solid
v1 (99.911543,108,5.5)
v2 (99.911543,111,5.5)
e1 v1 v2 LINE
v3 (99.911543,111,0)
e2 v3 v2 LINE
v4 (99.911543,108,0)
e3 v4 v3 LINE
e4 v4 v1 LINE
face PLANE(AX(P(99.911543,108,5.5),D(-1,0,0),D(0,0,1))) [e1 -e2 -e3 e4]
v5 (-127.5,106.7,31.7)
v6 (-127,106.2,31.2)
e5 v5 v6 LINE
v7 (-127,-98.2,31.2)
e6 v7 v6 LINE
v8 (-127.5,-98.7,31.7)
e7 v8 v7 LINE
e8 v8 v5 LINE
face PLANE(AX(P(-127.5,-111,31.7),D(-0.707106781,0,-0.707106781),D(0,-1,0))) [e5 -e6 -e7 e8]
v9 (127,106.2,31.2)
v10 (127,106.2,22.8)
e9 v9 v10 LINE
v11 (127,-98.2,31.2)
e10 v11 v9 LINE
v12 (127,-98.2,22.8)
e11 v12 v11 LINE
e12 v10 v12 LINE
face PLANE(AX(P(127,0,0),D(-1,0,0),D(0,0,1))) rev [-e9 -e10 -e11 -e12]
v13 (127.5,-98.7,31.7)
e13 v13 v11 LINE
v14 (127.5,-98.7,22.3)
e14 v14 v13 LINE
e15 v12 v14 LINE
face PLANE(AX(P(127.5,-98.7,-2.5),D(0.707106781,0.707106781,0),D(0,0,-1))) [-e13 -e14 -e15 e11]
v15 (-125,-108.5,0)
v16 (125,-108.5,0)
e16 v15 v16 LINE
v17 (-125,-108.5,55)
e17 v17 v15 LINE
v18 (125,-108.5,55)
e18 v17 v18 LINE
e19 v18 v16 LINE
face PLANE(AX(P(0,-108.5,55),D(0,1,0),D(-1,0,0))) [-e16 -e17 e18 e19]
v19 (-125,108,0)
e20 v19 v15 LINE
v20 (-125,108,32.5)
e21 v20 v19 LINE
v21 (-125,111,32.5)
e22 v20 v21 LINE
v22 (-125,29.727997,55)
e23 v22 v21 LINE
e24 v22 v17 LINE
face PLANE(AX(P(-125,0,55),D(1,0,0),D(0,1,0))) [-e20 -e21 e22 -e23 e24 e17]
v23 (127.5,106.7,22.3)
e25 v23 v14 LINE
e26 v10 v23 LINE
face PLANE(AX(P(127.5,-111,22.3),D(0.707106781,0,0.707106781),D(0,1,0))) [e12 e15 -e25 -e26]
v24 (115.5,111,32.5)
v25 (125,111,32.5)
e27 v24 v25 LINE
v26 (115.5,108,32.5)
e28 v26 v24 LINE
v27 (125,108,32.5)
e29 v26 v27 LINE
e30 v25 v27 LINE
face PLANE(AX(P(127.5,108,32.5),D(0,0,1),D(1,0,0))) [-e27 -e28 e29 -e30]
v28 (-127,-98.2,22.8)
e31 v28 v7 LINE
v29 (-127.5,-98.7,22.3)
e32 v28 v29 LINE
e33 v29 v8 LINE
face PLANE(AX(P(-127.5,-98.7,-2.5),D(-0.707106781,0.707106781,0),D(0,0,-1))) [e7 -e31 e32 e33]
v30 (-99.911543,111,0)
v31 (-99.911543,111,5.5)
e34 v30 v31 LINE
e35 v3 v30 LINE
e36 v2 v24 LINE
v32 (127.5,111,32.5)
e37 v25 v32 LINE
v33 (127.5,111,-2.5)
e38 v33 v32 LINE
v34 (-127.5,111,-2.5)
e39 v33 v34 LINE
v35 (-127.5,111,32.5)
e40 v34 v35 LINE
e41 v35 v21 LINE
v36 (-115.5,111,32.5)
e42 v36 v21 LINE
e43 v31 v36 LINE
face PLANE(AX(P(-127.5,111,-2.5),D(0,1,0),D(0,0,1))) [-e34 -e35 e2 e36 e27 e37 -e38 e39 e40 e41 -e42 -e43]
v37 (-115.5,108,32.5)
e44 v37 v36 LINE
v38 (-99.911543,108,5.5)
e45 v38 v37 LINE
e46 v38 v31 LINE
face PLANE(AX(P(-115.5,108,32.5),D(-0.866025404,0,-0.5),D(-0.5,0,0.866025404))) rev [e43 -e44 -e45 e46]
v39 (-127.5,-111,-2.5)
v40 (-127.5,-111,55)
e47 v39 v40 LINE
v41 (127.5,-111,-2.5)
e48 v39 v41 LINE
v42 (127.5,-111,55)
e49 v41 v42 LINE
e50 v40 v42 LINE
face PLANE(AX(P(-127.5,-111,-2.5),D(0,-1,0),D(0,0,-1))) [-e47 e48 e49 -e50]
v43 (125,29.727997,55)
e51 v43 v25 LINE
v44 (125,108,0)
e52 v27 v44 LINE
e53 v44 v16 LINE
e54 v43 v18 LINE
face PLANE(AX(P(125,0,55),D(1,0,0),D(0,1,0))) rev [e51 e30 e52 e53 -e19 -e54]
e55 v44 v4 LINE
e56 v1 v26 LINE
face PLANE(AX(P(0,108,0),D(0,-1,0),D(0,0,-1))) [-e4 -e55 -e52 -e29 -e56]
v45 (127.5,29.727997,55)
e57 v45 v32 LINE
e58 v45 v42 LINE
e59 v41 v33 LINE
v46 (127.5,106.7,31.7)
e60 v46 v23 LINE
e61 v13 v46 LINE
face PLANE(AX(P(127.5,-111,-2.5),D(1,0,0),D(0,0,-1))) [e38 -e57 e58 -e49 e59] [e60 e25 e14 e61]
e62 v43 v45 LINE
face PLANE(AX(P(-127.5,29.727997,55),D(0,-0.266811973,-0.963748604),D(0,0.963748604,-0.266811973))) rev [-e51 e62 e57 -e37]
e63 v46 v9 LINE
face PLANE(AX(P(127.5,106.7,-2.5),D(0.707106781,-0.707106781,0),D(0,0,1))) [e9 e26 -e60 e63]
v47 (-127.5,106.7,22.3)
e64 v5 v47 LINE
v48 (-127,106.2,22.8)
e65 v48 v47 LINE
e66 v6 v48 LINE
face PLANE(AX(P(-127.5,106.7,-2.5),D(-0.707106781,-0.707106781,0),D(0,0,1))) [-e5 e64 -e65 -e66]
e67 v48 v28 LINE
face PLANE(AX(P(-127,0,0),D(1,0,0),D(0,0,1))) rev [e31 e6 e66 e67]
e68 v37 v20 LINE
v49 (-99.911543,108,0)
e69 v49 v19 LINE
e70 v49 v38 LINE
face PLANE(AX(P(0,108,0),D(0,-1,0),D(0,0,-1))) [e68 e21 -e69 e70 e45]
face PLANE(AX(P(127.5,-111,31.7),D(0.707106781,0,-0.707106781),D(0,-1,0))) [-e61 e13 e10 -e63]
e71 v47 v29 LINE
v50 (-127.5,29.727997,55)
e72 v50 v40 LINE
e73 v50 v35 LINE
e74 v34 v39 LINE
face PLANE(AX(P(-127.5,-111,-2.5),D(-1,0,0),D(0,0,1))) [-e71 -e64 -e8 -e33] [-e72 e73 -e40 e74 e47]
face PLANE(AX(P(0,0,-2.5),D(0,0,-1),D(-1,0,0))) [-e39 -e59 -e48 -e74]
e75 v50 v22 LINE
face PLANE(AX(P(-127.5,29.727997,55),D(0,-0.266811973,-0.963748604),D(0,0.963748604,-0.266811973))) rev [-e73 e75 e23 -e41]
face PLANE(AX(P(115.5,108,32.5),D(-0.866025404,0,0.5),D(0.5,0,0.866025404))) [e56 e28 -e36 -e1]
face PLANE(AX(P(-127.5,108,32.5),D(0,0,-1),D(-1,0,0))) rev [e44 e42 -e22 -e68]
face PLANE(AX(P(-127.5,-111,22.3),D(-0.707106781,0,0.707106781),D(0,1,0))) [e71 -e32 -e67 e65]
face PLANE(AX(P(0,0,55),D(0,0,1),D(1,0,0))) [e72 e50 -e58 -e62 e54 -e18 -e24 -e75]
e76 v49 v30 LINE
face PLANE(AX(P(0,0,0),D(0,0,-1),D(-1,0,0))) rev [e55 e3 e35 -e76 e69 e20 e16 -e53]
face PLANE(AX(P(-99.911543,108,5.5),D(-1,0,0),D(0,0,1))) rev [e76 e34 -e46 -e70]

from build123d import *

# Parameters (mm, degrees)
SKETCH1_W                               = 255
SKETCH1_H                               = 222
BOSS_EXTRUDE1_DEPTH                     = 2.5
SKETCH2_W                               = 2.5
SKETCH2_H                               = 222
SKETCH2_W_2                             = 250
SKETCH2_H_2                             = 2.5
BOSS_EXTRUDE2_DEPTH                     = 55
HOLD_TAB_DEPTH                          = 3
FRONT_TAPER_DEPTH                       = 178.770216853
FRONT_TAPER_DEPTH_BACK                  = 178.770216853
SKETCH6_W                               = 8.4
SKETCH6_H                               = 204.4
MOUNTING_POCKET_DEPTH                   = 284.048140782
PRINT_CHAMFERS_SIZE                     = 0.5
PRINT_CHAMFERS_OF_MOUNTING_POCKETS_SIZE = 0.5


with BuildPart() as part:
    # Sketch1 → Boss-Extrude1 (new body)
    with BuildSketch(Plane.XY):
        Rectangle(SKETCH1_W, SKETCH1_H)
    extrude(amount=-BOSS_EXTRUDE1_DEPTH)

    # Sketch2 → Boss-Extrude2 (add)
    with BuildSketch(Plane.XY):
        with Locations((-126.25, 0)):
            Rectangle(SKETCH2_W, SKETCH2_H)
        with Locations((0, -109.75)):
            Rectangle(SKETCH2_W_2, SKETCH2_H_2)
        with Locations((126.25, 0)):
            Rectangle(SKETCH2_W, SKETCH2_H)
    extrude(amount=BOSS_EXTRUDE2_DEPTH)

    # Sketch4 → Hold Tab (add)
    with BuildSketch(Plane(origin=(0, 111, 0), x_dir=(1, 0, 0), z_dir=(0, 1, 0))):
        Polygon((127.5, 2.5), (127.5, -32.5), (115.5, -32.5), (99.911542732, -5.5), (99.911542732, 2.5), align=None)
    hold_tab = extrude(amount=-HOLD_TAB_DEPTH)

    # Hold Tabs: Hold Tab across plane
    add(hold_tab.mirror(Plane(origin=(0, 0, 0), x_dir=(0, 0, 1), z_dir=(1, 0, 0))))

    # Sketch5 → Front Taper (cut, two sides: drawn at the far end of the back side and taken through both)
    with BuildSketch(Plane(origin=(0, 0, 0), x_dir=(0, 0, -1), z_dir=(1, 0, 0)).offset(-FRONT_TAPER_DEPTH_BACK)):
        Polygon((-55, 29.727996643), (-32.5, 111), (-55, 111), align=None)
    extrude(amount=FRONT_TAPER_DEPTH + FRONT_TAPER_DEPTH_BACK, mode=Mode.SUBTRACT)

    # Sketch6 → Mounting Pocket (cut, through all)
    with BuildSketch(Plane.ZY.offset(-127)):
        with Locations((27, 4)):
            Rectangle(SKETCH6_W, SKETCH6_H)
    mounting_pocket = extrude(amount=-MOUNTING_POCKET_DEPTH, mode=Mode.SUBTRACT)

    # Print Chamfers
    print_chamfers_edges = [part.edges().sort_by_distance(p)[0] for p in [
        (127.5, 106.2, 27),
        (127.5, 4, 22.8),
        (127.5, -98.2, 27),
        (127.5, 4, 31.2),
    ]]
    chamfer(print_chamfers_edges, length=PRINT_CHAMFERS_SIZE - 0.0001)  # a hair under: the kernel refuses the full size

    # Mounting Pockets: Mounting Pocket across plane
    add(mounting_pocket.mirror(Plane(origin=(0, 0, 0), x_dir=(0, 0, 1), z_dir=(1, 0, 0))), mode=Mode.SUBTRACT)

    # Print Chamfers of Mounting Pockets
    print_chamfers_of_mounting_pockets_edges = [part.edges().sort_by_distance(p)[0] for p in [
        (-127.5, 106.2, 27),
        (-127.5, 4, 22.8),
        (-127.5, -98.2, 27),
        (-127.5, 4, 31.2),
    ]]
    chamfer(print_chamfers_of_mounting_pockets_edges, length=PRINT_CHAMFERS_OF_MOUNTING_POCKETS_SIZE - 0.0001)  # a hair under: the kernel refuses the full size


solid = part.part
